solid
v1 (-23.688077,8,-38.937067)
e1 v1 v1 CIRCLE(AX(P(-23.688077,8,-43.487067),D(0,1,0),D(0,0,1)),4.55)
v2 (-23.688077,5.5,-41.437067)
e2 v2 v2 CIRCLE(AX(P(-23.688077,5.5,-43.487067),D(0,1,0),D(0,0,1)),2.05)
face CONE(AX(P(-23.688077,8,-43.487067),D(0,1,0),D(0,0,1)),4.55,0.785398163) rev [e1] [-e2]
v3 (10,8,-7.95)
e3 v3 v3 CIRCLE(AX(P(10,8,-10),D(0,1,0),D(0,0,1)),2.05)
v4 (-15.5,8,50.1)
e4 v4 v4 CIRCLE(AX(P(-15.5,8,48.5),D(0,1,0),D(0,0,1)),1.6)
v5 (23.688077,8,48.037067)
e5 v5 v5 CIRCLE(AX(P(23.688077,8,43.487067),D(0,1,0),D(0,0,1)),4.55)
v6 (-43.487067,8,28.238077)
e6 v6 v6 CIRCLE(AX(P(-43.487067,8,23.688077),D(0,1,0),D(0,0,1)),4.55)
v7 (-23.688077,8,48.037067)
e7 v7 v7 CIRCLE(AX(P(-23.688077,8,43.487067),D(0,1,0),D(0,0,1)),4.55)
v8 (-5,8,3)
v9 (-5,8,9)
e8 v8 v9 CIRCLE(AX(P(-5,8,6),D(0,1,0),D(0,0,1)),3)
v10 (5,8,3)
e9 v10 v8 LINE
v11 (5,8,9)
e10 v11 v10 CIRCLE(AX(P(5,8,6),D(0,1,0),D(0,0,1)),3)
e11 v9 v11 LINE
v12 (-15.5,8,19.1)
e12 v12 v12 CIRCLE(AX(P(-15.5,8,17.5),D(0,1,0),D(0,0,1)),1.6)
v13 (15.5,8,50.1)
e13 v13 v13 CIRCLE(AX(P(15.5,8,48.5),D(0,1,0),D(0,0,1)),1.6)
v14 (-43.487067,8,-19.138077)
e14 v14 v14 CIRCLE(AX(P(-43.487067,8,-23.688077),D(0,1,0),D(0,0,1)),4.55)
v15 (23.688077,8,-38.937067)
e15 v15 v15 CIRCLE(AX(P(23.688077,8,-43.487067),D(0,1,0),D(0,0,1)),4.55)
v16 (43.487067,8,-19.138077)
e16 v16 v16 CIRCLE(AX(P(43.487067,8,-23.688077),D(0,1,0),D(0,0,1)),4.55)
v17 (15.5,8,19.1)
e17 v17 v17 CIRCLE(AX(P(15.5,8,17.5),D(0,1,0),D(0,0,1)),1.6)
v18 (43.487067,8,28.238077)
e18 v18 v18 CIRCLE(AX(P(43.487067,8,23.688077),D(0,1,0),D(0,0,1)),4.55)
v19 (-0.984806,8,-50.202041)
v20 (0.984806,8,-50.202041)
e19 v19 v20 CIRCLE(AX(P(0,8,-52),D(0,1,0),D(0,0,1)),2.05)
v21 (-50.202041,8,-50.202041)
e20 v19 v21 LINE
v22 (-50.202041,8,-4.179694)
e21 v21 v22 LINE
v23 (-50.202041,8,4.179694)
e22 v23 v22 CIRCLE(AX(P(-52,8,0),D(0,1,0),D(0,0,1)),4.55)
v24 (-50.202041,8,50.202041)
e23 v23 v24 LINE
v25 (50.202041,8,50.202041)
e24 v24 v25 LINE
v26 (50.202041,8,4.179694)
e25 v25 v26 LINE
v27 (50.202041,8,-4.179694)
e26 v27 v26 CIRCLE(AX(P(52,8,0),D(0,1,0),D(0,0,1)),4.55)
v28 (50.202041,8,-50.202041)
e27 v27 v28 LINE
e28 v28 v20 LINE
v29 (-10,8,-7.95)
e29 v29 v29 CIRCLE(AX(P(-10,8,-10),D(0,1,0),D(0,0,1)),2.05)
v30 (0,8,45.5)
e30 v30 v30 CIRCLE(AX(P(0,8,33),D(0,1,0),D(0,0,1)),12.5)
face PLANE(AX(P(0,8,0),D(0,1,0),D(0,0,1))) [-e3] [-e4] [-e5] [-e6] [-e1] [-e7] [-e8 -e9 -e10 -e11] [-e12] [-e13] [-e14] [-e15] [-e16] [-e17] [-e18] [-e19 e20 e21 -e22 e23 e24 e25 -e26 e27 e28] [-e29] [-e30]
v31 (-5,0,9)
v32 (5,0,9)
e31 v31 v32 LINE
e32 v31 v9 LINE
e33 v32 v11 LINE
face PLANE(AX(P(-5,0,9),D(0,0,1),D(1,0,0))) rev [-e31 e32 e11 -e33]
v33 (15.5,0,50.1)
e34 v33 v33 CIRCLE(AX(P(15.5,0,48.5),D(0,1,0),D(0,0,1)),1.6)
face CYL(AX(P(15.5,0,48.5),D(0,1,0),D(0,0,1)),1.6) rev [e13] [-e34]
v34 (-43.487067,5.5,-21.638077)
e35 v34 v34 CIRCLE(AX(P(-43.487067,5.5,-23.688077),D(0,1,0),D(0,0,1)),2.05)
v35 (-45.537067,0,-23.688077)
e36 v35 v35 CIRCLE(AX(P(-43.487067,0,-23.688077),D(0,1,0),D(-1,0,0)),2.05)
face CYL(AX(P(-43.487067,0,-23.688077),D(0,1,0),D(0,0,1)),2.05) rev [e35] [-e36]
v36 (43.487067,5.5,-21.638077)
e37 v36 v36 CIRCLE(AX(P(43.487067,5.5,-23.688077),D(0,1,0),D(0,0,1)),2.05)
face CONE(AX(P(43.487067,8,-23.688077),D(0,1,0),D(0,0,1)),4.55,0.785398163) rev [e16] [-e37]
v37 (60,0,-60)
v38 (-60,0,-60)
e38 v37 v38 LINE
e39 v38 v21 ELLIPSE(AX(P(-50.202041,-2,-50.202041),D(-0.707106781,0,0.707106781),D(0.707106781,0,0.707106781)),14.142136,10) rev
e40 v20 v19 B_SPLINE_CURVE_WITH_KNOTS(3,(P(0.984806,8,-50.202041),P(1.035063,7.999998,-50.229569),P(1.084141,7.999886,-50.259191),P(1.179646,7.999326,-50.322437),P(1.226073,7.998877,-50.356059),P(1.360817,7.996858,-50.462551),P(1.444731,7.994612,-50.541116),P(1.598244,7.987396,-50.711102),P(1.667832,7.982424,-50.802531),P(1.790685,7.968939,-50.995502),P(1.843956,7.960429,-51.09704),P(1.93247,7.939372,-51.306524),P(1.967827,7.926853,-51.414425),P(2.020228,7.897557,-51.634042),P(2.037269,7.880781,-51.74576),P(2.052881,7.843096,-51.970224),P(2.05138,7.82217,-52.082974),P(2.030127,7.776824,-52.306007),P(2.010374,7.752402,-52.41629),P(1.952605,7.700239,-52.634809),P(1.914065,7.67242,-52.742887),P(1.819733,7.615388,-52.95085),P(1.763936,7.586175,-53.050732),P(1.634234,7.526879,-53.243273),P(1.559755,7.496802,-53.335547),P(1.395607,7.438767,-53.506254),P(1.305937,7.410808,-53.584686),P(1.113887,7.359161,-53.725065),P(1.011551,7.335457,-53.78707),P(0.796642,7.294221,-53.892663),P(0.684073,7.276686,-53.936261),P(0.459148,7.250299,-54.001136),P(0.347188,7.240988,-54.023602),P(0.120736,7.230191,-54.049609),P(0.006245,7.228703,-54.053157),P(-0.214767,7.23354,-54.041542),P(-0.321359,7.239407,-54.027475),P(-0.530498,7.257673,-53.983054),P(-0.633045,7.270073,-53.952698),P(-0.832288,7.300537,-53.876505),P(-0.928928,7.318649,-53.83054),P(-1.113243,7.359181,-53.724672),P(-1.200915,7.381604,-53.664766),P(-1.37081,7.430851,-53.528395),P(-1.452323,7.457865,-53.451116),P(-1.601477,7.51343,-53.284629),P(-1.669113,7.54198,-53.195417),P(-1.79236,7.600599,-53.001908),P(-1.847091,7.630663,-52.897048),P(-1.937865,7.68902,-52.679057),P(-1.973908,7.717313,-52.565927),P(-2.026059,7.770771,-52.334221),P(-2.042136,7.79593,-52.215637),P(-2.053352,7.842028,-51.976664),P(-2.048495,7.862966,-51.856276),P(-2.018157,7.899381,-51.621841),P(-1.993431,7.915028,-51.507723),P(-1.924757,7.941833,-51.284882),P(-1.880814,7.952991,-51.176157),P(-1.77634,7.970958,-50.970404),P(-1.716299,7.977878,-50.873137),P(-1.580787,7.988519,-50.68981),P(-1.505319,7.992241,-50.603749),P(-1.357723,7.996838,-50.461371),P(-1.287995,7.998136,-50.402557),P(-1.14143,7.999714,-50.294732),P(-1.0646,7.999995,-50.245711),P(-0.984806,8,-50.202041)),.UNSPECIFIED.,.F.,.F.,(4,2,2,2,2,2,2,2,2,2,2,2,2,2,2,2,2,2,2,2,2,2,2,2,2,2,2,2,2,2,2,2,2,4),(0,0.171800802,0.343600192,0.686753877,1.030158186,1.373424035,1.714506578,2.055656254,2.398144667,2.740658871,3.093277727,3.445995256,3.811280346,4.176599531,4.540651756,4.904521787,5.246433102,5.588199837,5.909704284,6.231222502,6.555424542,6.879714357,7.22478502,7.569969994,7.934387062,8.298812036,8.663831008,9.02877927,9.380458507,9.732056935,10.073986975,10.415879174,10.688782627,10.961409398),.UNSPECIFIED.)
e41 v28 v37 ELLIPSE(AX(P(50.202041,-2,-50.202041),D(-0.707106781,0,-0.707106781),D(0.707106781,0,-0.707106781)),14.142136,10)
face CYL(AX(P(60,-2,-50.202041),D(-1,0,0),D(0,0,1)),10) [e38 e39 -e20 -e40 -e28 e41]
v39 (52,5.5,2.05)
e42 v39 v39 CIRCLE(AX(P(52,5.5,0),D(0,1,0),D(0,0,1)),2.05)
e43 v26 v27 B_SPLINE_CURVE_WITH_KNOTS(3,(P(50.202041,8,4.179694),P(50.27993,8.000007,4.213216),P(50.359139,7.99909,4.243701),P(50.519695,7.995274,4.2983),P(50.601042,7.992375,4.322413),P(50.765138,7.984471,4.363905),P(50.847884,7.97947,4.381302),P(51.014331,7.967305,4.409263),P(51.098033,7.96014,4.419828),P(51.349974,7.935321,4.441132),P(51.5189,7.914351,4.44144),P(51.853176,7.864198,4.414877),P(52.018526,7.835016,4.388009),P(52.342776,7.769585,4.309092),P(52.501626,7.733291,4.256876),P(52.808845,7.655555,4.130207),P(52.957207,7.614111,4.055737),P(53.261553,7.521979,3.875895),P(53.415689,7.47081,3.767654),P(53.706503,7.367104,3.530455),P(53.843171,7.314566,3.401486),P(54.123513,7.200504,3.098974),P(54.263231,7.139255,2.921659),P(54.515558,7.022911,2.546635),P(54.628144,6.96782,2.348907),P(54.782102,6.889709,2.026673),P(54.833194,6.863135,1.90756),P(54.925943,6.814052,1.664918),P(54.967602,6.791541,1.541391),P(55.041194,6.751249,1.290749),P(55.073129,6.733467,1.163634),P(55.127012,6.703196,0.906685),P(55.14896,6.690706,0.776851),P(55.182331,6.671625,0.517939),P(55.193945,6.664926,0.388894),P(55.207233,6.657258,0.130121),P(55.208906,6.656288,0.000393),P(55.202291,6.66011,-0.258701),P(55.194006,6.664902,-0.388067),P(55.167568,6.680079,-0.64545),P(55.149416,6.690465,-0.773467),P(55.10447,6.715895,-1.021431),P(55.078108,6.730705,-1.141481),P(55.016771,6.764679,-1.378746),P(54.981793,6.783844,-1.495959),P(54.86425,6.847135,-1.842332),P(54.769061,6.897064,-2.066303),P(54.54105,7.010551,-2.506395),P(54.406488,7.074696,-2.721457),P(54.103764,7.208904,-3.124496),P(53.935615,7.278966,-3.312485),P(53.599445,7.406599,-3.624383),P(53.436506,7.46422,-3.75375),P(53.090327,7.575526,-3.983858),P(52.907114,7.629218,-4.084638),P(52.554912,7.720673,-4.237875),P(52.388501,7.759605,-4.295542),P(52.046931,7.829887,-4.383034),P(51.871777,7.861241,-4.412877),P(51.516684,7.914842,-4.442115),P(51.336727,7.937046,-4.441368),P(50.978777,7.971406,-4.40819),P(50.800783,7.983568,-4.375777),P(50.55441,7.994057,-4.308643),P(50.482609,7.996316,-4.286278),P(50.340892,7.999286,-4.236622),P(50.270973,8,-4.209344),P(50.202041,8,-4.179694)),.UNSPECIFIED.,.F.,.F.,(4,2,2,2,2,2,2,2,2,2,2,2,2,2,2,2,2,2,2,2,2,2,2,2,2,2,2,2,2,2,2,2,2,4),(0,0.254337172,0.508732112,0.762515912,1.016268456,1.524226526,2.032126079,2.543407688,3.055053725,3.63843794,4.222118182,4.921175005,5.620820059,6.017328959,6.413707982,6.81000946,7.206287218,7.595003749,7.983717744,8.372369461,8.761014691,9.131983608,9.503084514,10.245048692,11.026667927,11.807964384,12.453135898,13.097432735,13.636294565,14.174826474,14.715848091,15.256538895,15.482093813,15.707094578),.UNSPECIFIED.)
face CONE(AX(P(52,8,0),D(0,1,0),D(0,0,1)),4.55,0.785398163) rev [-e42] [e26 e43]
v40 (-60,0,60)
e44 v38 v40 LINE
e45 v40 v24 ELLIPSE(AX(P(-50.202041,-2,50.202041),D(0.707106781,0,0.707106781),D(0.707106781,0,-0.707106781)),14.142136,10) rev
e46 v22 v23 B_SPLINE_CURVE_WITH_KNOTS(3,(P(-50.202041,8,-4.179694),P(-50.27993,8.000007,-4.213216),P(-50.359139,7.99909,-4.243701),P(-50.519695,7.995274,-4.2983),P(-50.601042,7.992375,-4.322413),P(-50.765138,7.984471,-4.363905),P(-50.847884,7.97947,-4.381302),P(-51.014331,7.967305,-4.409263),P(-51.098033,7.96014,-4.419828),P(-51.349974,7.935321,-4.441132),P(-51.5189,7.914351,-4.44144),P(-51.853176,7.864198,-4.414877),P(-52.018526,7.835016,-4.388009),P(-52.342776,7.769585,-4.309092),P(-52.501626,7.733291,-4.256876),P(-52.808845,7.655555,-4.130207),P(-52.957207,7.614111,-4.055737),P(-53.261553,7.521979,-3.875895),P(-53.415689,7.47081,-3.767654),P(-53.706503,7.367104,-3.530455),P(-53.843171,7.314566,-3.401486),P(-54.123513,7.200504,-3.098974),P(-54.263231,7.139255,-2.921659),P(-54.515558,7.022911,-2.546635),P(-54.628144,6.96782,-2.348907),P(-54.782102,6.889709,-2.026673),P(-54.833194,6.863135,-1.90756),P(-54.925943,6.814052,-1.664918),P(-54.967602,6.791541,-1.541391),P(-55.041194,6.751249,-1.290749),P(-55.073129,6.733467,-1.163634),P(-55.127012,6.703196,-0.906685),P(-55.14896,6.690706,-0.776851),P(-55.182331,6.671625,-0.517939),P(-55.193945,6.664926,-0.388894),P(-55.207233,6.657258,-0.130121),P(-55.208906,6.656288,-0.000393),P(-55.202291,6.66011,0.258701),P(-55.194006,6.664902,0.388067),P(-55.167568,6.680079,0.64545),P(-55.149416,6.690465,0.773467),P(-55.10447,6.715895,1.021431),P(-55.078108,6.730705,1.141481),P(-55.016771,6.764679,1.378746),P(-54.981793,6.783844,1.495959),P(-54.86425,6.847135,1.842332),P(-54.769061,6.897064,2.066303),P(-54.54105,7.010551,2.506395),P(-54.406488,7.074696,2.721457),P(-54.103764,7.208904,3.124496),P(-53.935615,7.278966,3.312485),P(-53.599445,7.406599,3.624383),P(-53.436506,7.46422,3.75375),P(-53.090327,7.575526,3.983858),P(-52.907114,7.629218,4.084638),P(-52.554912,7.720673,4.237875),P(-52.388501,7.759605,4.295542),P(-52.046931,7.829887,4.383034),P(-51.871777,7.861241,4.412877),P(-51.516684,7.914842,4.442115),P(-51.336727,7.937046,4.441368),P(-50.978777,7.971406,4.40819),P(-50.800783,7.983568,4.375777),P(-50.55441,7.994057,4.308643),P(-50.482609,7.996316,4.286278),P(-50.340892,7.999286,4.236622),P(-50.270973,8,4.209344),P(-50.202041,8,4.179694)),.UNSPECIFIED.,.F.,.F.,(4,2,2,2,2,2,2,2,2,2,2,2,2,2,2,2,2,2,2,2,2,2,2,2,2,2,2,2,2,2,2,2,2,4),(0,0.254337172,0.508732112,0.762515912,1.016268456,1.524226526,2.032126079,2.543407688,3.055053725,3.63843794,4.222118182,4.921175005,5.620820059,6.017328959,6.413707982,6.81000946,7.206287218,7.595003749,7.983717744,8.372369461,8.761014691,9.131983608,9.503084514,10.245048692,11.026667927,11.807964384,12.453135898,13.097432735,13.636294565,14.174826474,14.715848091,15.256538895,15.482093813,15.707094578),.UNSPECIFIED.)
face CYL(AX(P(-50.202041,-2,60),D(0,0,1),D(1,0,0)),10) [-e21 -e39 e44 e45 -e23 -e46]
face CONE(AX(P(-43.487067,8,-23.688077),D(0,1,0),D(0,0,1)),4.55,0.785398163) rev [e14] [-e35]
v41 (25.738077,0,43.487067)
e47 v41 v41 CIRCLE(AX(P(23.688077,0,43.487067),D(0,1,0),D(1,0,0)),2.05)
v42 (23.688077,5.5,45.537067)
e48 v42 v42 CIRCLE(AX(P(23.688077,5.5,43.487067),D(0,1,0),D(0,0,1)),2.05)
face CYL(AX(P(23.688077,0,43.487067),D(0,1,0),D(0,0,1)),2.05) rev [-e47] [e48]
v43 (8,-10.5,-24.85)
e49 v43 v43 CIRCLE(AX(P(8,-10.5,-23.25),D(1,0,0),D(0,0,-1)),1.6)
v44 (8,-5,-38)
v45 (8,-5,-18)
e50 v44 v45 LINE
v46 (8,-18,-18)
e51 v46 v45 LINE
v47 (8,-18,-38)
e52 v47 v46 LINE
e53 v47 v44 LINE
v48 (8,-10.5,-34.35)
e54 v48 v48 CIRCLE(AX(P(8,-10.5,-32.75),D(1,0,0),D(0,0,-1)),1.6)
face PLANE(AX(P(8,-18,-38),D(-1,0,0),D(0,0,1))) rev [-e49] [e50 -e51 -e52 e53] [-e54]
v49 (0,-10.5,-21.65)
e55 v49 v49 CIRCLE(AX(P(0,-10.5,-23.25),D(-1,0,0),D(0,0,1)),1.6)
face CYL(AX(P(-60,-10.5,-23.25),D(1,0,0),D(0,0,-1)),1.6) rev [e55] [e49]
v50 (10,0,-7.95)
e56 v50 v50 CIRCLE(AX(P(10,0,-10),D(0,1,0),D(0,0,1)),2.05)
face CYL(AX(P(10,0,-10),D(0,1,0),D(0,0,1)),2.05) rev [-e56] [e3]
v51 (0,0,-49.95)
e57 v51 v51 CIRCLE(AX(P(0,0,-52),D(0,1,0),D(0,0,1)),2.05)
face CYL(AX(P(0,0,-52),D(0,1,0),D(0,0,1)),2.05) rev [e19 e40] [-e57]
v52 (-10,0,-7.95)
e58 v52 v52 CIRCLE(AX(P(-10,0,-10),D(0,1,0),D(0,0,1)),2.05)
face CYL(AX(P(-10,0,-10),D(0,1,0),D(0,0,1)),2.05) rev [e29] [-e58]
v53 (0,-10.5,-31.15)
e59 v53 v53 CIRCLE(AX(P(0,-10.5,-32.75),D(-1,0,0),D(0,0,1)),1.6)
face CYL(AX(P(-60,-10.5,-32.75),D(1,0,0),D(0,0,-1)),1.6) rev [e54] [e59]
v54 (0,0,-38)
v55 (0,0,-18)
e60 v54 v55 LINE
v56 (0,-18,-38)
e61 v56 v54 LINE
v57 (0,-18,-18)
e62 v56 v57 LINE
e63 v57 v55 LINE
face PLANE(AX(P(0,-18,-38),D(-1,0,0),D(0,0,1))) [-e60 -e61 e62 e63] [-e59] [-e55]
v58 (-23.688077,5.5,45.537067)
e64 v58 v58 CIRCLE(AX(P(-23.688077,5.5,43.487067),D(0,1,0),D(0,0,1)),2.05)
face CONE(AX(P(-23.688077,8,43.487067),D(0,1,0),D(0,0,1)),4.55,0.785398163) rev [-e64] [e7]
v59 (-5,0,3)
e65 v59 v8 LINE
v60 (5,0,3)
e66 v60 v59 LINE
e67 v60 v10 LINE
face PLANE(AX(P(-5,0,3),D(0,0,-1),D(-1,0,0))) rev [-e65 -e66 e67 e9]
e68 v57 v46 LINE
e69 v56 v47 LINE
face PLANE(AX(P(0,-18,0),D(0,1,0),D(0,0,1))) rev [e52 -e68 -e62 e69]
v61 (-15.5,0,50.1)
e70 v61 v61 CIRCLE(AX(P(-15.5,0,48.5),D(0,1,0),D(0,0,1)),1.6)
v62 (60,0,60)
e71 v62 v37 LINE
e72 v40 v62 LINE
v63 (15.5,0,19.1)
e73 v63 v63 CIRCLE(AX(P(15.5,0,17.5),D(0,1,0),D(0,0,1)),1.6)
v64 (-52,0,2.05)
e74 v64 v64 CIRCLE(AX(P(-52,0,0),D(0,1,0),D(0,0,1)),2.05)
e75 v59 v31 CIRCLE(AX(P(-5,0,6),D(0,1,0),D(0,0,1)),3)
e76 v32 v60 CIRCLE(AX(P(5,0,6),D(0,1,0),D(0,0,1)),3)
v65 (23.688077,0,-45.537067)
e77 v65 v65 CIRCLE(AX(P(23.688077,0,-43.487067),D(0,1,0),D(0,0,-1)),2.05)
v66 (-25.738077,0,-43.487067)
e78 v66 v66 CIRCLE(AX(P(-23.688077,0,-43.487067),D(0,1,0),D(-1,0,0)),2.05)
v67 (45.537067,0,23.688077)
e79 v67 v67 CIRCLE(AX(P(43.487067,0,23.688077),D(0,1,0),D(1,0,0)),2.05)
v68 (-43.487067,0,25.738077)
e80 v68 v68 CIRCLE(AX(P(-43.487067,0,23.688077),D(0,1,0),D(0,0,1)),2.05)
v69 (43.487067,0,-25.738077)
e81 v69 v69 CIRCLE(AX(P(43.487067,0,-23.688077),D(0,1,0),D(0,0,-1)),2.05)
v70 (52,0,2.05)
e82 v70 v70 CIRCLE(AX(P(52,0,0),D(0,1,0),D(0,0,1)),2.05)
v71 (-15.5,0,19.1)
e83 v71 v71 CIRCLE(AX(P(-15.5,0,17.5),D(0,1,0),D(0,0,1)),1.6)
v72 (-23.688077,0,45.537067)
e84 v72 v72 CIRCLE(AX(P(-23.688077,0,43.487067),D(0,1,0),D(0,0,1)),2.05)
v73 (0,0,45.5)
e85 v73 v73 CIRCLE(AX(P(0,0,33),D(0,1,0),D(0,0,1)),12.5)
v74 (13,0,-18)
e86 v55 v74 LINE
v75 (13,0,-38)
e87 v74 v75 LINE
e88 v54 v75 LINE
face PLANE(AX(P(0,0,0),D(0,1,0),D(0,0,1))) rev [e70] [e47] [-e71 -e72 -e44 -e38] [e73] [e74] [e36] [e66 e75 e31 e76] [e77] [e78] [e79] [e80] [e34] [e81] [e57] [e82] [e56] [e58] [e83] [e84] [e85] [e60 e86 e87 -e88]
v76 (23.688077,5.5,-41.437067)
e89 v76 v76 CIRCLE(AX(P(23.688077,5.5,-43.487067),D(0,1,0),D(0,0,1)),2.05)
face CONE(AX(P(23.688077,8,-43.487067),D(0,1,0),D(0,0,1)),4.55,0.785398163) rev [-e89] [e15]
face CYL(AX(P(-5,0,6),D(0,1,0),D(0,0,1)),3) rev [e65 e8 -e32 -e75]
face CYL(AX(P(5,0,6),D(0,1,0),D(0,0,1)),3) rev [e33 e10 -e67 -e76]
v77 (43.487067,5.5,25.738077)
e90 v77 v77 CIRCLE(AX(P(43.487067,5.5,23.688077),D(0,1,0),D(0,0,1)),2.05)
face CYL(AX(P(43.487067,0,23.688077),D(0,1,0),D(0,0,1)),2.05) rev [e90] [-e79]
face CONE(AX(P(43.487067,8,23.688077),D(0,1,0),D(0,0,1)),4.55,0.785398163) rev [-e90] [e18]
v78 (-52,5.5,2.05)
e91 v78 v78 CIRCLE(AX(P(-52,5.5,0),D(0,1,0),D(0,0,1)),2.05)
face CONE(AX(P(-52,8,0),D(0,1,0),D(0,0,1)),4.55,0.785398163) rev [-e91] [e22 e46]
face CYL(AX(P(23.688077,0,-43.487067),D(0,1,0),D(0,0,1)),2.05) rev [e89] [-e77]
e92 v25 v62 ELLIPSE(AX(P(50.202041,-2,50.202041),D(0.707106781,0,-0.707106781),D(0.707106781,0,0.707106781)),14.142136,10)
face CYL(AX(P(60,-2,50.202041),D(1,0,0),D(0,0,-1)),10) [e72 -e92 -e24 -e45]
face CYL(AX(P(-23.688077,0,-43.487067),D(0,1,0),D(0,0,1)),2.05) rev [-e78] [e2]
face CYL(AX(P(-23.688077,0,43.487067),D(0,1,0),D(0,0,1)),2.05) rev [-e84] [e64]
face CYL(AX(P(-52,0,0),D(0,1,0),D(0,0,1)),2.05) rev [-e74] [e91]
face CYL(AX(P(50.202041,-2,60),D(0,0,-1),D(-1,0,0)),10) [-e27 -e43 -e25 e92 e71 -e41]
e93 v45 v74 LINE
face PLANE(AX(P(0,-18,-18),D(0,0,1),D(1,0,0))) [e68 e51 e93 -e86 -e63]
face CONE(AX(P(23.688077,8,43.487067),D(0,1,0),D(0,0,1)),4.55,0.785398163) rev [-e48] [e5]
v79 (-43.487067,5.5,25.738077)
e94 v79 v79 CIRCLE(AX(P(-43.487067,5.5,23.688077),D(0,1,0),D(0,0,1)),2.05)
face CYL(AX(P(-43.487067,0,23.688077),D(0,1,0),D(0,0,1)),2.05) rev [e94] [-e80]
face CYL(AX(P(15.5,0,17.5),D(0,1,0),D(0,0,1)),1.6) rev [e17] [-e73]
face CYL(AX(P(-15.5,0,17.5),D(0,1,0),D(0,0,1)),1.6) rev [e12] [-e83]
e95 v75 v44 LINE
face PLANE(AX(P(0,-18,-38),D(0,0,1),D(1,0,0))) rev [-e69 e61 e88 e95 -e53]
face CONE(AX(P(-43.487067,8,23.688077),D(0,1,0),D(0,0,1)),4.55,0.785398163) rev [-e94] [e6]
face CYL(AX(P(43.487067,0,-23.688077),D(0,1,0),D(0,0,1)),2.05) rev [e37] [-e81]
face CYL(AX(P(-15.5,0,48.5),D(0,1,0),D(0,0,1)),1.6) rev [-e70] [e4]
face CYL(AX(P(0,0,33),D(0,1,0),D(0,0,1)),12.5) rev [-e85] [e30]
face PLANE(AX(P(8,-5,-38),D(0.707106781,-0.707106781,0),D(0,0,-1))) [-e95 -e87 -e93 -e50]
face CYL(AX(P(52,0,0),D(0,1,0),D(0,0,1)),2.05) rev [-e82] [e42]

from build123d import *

# Parameters (mm, degrees)
SKETCH1_W                                           = 120
SKETCH1_H                                           = 120
BOSS_EXTRUDE1_DEPTH                                 = 8
SKETCH2_R                                           = 12.5
SKETCH2_R_2                                         = 1.6
CUT_EXTRUDE1_DEPTH                                  = 86.229103011
SKETCH3_R                                           = 2.05
CUT_EXTRUDE2_DEPTH                                  = 86.229103011
CIRPATTERN1_COUNT                                   = 4
SKETCH4_R                                           = 2.05
CUT_EXTRUDE3_DEPTH                                  = 86.229103011
SKETCH5_R                                           = 2.05
CUT_EXTRUDE4_DEPTH                                  = 86.229103011
SKETCH6_W                                           = 8
SKETCH6_H                                           = 20
BOSS_EXTRUDE2_DEPTH                                 = 18
CHAMFER1_SIZE                                       = 5
SKETCH7_R                                           = 1.6
CUT_EXTRUDE5_DEPTH                                  = 93.455394651
CSK_FOR_M4_COUNTERSUNK_FLAT_HEAD_SCREW1_D           = 4.1
CSK_FOR_M4_COUNTERSUNK_FLAT_HEAD_SCREW1_DEPTH       = 7.999
CSK_FOR_M4_COUNTERSUNK_FLAT_HEAD_SCREW1_CSINK_D     = 9.1
CSK_FOR_M4_COUNTERSUNK_FLAT_HEAD_SCREW1_CSINK_ANGLE = 90
CSK_FOR_M4_COUNTERSUNK_FLAT_HEAD_SCREW1_TIP         = 1.231764269
FILLET1_R                                           = 10


with BuildPart() as part:
    # Sketch1 → Boss-Extrude1 (new body)
    with BuildSketch(Plane(origin=(0, 0, 0), x_dir=(1, 0, 0), z_dir=(0, 1, 0))):
        Rectangle(SKETCH1_W, SKETCH1_H)
    extrude(amount=BOSS_EXTRUDE1_DEPTH)

    # Sketch2 → Cut-Extrude1 (cut, through all)
    with BuildSketch(Plane(origin=(0, 8, 0), x_dir=(1, 0, 0), z_dir=(0, 1, 0))):
        with Locations(Location((0, -33, 0), (0, 0, 270))):
            Circle(SKETCH2_R)
        with Locations(Location((-15.5, -48.5, 0), (0, 0, 270))):
            Circle(SKETCH2_R_2)
        with Locations(Location((15.5, -48.5, 0), (0, 0, 270))):
            Circle(SKETCH2_R_2)
        with Locations(Location((15.5, -17.5, 0), (0, 0, 270))):
            Circle(SKETCH2_R_2)
        with Locations(Location((-15.5, -17.5, 0), (0, 0, 270))):
            Circle(SKETCH2_R_2)
    extrude(amount=-CUT_EXTRUDE1_DEPTH, mode=Mode.SUBTRACT)

    # Sketch3 → Cut-Extrude2 (cut, through all)
    with BuildSketch(Plane(origin=(0, 8, 0), x_dir=(1, 0, 0), z_dir=(0, 1, 0))):
        with Locations(Location((-43.487067043, -23.68807717, 0), (0, 0, 270))):
            Circle(SKETCH3_R)
        with Locations(Location((-23.68807717, -43.487067043, 0), (0, 0, 270))):
            Circle(SKETCH3_R)
    cut_extrude2 = extrude(amount=-CUT_EXTRUDE2_DEPTH, mode=Mode.SUBTRACT)

    # CirPattern1: Cut-Extrude2 ×4 about axis
    cirpattern1_axis = Axis((0, 0, 0), (0, 1, 0))
    for i in range(1, CIRPATTERN1_COUNT):
        add(cut_extrude2.rotate(cirpattern1_axis, i * 360 / CIRPATTERN1_COUNT), mode=Mode.SUBTRACT)

    # Sketch4 → Cut-Extrude3 (cut, through all)
    with BuildSketch(Plane(origin=(0, 8, 0), x_dir=(1, 0, 0), z_dir=(0, 1, 0))):
        with Locations(Location((-52, 0, 0), (0, 0, 270))):
            Circle(SKETCH4_R)
        with Locations(Location((52, 0, 0), (0, 0, 270))):
            Circle(SKETCH4_R)
        with Locations(Location((0, 52, 0), (0, 0, 270))):
            Circle(SKETCH4_R)
    extrude(amount=-CUT_EXTRUDE3_DEPTH, mode=Mode.SUBTRACT)

    # Sketch5 → Cut-Extrude4 (cut, through all)
    with BuildSketch(Plane(origin=(0, 8, 0), x_dir=(1, 0, 0), z_dir=(0, 1, 0))):
        with Locations(Location((-10, 10, 0), (0, 0, 270))):
            Circle(SKETCH5_R)
        with Locations(Location((10, 10, 0), (0, 0, 270))):
            Circle(SKETCH5_R)
        with BuildLine():
            Line((-5, -3), (5, -3))
            ThreePointArc((5, -3), (8, -6), (5, -9))
            Line((5, -9), (-5, -9))
            ThreePointArc((-5, -9), (-8, -6), (-5, -3))
        make_face()
    extrude(amount=-CUT_EXTRUDE4_DEPTH, mode=Mode.SUBTRACT)

    # Sketch6 → Boss-Extrude2 (add)
    with BuildSketch(Plane.XZ):
        with Locations((4, -28)):
            Rectangle(SKETCH6_W, SKETCH6_H)
    extrude(amount=BOSS_EXTRUDE2_DEPTH)

    # Chamfer1
    chamfer1_edges = [part.edges().sort_by_distance(p)[0] for p in [
        (8, 0, -28),
    ]]
    chamfer(chamfer1_edges, length=CHAMFER1_SIZE)

    # Sketch7 → Cut-Extrude5 (cut, through all)
    with BuildSketch(Plane(origin=(8, 0, 0), x_dir=(0, 0, -1), z_dir=(1, 0, 0))):
        with Locations((23.25, -10.5)):
            Circle(SKETCH7_R)
        with Locations((32.75, -10.5)):
            Circle(SKETCH7_R)
    extrude(amount=-CUT_EXTRUDE5_DEPTH, mode=Mode.SUBTRACT)

    # CSK for M4 Countersunk Flat Head Screw1
    with Locations(Plane(origin=(-52, 8, 0), x_dir=(0, 0, 1), z_dir=(0, 1, 0))):
        with Locations((0, 0), (23.68807717, 8.512932957), (43.487067043, 28.31192283), (43.487067043, 75.68807717), (23.68807717, 95.487067043), (0, 104), (-23.68807717, 95.487067043), (-43.487067043, 75.68807717), (-43.487067043, 28.31192283), (-23.68807717, 8.512932957)):
            CounterSinkHole(CSK_FOR_M4_COUNTERSUNK_FLAT_HEAD_SCREW1_D / 2, CSK_FOR_M4_COUNTERSUNK_FLAT_HEAD_SCREW1_CSINK_D / 2, depth=CSK_FOR_M4_COUNTERSUNK_FLAT_HEAD_SCREW1_DEPTH, counter_sink_angle=CSK_FOR_M4_COUNTERSUNK_FLAT_HEAD_SCREW1_CSINK_ANGLE)
            with Locations((0, 0, -(CSK_FOR_M4_COUNTERSUNK_FLAT_HEAD_SCREW1_DEPTH + CSK_FOR_M4_COUNTERSUNK_FLAT_HEAD_SCREW1_TIP / 2))):  # 118° drill point
                Cone(0, CSK_FOR_M4_COUNTERSUNK_FLAT_HEAD_SCREW1_D / 2, CSK_FOR_M4_COUNTERSUNK_FLAT_HEAD_SCREW1_TIP, mode=Mode.SUBTRACT)

    # Fillet1
    # the kernel refuses this fillet: 10 mm, written as the material it takes off along each edge
    with BuildSketch(Plane(origin=(-84.494897428, 8, -60), x_dir=(0, 0, 1), z_dir=(1, 0, 0)), Plane(origin=(60, 8, -84.494897428), x_dir=(-1, 0, 0), z_dir=(0, 0, 1)), Plane(origin=(-60, 8, 84.494897428), x_dir=(1, 0, 0), z_dir=(0, 0, -1)), Plane(origin=(84.494897428, 8, 60), x_dir=(0, 0, -1), z_dir=(-1, 0, 0))) as fillet1_piece_1:
        with BuildLine():
            CenterArc((9.797958971, 10), FILLET1_R, 191.536959033, 78.463040967)
            Line((0, 8), (0, 0))
            Line((0, 0), (9.797958971, 0))
        make_face()
    extrude(amount=168.989794856, mode=Mode.SUBTRACT)


solid = part.part
